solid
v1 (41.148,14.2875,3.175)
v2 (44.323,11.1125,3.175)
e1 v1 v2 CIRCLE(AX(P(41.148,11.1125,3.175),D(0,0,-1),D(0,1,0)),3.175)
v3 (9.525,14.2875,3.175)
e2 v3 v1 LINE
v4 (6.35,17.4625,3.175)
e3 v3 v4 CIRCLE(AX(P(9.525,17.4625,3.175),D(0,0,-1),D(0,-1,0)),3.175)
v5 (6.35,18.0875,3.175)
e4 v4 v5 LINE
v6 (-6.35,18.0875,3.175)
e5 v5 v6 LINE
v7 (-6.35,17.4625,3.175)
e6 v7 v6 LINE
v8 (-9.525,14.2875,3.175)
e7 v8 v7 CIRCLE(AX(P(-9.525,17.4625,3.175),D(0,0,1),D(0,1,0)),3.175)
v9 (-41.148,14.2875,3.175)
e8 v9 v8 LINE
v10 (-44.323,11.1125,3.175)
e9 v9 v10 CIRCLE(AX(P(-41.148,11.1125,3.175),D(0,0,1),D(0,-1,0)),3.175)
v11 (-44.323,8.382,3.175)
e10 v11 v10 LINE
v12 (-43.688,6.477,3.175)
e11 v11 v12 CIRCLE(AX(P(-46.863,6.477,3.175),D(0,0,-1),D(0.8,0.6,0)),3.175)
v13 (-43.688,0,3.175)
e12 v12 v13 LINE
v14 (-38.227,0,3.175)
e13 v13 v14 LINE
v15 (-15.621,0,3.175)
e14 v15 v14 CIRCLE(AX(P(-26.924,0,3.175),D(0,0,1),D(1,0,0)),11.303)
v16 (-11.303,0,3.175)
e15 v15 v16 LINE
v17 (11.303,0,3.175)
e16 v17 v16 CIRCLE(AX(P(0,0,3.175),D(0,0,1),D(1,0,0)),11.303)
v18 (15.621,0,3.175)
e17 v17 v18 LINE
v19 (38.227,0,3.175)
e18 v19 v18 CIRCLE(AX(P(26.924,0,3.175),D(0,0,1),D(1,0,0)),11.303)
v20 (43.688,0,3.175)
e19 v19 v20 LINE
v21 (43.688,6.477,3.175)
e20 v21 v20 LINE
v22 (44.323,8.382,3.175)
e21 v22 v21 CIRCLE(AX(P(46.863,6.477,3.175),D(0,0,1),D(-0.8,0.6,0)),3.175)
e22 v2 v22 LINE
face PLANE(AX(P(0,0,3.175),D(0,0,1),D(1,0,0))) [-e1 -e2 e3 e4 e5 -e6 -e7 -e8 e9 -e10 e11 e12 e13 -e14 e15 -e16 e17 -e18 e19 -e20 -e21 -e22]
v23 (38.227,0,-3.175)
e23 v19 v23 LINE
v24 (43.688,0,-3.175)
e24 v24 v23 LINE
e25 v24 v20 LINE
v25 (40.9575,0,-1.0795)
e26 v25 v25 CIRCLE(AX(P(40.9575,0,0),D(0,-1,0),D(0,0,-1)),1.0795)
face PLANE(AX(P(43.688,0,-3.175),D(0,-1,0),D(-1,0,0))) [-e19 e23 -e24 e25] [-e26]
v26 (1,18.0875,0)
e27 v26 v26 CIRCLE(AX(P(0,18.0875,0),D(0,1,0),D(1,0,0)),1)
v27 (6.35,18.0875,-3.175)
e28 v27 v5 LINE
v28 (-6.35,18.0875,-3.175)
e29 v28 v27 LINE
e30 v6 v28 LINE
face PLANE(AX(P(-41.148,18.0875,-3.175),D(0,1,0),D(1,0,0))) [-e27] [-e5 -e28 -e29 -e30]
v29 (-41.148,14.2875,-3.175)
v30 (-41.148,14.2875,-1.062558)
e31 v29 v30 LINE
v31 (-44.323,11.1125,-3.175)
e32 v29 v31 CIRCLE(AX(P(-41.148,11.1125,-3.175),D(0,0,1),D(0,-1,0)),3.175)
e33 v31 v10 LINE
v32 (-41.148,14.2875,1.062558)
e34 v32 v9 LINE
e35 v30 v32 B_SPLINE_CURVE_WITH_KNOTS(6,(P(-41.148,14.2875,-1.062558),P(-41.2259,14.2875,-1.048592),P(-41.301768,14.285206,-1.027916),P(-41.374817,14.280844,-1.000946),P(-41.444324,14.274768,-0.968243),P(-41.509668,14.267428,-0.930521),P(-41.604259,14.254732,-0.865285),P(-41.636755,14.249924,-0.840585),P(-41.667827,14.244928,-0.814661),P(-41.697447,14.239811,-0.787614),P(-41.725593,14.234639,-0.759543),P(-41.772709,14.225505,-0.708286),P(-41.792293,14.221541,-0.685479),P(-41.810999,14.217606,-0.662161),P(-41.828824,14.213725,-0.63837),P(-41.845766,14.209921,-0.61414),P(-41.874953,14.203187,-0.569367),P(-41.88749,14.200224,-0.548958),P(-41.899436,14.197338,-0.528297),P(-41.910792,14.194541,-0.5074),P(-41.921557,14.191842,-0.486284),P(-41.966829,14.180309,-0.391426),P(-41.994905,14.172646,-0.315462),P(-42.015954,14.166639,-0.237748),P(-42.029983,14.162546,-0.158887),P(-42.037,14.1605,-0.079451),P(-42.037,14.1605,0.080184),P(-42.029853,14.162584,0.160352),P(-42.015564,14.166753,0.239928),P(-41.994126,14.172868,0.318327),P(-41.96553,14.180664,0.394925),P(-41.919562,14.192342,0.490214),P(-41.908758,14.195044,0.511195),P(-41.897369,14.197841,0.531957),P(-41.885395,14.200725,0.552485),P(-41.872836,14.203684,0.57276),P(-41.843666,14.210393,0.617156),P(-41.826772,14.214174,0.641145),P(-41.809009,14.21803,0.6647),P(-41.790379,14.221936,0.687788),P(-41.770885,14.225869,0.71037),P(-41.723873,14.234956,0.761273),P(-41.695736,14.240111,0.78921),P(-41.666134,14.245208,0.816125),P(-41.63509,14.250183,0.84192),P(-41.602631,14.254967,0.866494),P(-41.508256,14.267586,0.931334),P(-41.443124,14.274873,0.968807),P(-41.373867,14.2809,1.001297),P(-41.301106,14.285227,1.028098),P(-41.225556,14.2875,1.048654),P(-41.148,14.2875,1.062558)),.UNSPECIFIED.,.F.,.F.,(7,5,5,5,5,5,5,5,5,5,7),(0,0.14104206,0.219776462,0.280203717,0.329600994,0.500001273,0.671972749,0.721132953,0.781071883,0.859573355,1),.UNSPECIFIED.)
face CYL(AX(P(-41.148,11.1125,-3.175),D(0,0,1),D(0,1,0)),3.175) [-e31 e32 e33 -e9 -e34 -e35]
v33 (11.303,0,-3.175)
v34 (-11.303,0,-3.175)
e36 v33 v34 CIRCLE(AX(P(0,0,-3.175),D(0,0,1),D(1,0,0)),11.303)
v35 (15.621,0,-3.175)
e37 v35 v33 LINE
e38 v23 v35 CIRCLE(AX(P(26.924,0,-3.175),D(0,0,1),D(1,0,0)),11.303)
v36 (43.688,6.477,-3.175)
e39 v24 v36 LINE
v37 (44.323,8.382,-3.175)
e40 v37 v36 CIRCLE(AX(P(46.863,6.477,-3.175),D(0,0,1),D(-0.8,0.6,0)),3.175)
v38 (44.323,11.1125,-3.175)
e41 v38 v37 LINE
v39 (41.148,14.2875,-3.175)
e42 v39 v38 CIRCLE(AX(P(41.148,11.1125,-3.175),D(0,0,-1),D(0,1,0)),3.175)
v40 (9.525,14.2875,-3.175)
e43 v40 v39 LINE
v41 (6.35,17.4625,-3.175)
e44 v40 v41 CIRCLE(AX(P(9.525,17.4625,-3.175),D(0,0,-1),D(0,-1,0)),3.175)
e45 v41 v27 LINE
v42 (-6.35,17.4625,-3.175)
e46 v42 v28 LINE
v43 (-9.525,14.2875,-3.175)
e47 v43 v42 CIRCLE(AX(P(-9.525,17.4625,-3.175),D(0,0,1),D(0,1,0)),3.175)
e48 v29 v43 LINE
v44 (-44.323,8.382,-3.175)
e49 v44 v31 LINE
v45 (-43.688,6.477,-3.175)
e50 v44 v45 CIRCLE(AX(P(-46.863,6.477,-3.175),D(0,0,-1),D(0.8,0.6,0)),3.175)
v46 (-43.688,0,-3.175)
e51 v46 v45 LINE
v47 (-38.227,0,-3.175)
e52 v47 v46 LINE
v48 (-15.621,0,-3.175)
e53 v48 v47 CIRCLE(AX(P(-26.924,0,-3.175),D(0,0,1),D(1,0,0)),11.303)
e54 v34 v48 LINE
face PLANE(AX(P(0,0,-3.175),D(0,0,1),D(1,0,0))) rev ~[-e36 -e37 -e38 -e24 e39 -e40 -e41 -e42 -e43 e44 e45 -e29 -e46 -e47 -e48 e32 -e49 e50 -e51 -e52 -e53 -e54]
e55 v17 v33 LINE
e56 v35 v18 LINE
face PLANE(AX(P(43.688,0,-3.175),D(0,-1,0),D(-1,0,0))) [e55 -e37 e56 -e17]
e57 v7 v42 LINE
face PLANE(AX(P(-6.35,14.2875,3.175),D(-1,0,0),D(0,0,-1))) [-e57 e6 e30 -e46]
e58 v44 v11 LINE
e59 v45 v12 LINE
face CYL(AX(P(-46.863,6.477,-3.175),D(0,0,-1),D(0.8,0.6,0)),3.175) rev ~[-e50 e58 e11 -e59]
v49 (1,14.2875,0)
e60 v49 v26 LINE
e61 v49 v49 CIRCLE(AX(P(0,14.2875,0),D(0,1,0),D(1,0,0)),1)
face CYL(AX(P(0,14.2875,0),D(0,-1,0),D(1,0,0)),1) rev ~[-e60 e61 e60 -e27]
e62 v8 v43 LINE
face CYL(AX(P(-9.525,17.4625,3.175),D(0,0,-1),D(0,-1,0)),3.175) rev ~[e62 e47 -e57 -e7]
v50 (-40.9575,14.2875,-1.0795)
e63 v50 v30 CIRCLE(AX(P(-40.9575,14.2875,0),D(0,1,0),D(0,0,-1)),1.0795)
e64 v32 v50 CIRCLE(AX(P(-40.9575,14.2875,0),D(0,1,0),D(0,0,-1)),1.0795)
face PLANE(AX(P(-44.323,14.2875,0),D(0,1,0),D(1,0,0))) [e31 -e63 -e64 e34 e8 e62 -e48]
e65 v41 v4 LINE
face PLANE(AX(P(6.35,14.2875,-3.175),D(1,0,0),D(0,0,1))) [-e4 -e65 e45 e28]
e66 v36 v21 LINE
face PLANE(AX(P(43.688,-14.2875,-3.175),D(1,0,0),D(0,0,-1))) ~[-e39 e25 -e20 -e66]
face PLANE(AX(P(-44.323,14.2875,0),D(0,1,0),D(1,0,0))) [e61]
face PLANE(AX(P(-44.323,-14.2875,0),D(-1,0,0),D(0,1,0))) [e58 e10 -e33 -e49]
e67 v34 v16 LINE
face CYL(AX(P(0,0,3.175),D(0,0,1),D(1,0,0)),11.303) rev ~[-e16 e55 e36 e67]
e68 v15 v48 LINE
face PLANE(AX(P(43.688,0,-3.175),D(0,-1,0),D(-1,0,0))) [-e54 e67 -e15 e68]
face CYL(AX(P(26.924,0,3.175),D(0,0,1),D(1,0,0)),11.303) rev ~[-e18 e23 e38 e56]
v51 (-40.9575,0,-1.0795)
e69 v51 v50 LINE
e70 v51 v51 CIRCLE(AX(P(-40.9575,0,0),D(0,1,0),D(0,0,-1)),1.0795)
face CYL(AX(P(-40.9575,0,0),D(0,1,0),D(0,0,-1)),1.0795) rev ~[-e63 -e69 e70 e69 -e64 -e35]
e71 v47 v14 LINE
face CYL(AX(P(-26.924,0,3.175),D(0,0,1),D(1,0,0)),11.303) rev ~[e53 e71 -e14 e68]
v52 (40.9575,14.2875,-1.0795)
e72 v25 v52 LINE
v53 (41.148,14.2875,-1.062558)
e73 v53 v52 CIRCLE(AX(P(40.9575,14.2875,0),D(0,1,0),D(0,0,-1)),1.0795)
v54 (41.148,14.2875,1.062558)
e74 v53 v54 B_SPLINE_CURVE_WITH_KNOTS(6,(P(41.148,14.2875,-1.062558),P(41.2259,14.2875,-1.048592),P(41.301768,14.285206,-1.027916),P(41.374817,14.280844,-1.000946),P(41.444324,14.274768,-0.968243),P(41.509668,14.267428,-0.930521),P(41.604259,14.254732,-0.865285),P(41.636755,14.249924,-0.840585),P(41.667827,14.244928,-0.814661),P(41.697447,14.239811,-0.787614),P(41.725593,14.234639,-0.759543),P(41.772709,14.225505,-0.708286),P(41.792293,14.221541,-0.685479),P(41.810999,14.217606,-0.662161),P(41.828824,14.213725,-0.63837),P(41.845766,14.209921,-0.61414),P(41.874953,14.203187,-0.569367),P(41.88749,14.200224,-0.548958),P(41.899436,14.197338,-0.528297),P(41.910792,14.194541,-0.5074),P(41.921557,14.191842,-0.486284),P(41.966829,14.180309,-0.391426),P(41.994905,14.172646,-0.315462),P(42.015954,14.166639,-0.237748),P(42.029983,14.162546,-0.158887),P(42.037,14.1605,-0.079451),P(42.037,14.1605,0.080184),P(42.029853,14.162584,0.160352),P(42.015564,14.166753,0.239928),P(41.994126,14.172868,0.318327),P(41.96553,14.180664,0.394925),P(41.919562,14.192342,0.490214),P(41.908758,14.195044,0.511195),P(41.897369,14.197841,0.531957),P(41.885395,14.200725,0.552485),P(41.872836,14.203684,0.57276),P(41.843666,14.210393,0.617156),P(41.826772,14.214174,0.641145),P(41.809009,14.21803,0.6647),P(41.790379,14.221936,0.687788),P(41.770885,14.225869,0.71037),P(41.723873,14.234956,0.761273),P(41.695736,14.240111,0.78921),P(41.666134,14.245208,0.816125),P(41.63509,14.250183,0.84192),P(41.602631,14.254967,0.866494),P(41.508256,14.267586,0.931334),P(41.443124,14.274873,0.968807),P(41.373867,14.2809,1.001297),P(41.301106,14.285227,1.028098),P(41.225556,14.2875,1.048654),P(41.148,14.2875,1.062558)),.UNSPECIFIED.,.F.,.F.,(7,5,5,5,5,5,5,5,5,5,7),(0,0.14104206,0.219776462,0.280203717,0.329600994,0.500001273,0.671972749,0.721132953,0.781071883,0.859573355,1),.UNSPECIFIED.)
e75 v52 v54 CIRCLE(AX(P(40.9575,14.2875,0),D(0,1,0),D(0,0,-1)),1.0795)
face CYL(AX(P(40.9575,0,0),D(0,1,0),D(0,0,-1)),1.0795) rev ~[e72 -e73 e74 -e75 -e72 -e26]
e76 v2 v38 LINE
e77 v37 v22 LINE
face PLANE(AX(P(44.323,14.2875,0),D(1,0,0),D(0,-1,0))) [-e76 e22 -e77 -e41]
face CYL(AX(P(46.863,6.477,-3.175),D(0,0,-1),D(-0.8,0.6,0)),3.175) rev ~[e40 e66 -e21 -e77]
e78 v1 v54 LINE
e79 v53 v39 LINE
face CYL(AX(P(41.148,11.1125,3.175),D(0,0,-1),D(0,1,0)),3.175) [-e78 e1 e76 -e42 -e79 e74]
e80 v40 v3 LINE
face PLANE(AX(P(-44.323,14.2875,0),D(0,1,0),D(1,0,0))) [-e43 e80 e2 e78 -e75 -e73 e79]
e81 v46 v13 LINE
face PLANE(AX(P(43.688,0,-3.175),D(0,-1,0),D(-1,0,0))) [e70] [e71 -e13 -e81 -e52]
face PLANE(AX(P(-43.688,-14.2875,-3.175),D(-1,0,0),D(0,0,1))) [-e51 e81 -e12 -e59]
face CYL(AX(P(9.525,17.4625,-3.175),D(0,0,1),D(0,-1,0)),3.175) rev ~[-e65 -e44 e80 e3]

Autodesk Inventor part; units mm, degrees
ref_plane "YZ Plane" through (0, 0, 0) normal (1, 0, 0) x (0, 1, 0)
ref_plane "XZ Plane" through (0, 0, 0) normal (0, 1, 0) x (-1, 0, 0)
ref_plane "XY Plane" through (0, 0, 0) normal (0, 0, 1) x (1, 0, 0)
sketch "Sketch1" plane through (0, 0, 0) normal (0, 0, 1) x (1, 0, 0)
  line L0 (-44.323, 14.2875) -> (44.323, 14.2875)
  line L1 (44.323, 14.2875) -> (44.323, -14.2875)
  line L2 (44.323, -14.2875) -> (-44.323, -14.2875)
  line L3 (-44.323, -14.2875) -> (-44.323, 14.2875)
  point P0 (0, 0)
  dimension "d0" = 88.646
  dimension "d1" = 44.323
  dimension "d2" = 14.2875
  dimension "d3" = 28.575
extrude "Extrusion1" add sketch "Sketch1" along normal mid plane 6.35
sketch "Sketch2" plane through (0, 0, 3.175) normal (0, 0, 1) x (1, 0, 0)
  circle A0 centre (-26.924, 0) radius 11.303
  circle A1 centre (0, 0) radius 11.303
  line L0 (44.323, -14.2875) -> (44.323, 14.2875) projected
  circle A2 centre (26.924, 0) radius 11.303
  line L1 (-44.323, 14.2875) -> (-44.323, -14.2875) projected
  line L2 (-44.323, 0) -> (44.323, 0) construction
  line L3 (44.323, 14.2875) -> (-44.323, 14.2875) projected
  point P0 (0, 0)
  dimension "d6" = 22.606
  dimension "d9" = 22.606
  dimension "d11" = 22.606
  dimension "d14" = 26.924
  dimension "d21" = 88.646
  dimension "d22" = 26.924
  dimension "d45" = 0
sketch "Sketch4" plane through (-44.323, -14.2875, -3.175) normal (-1, 0, 0) x (0, 0, 1)
  line L0 (0, 0) -> (0, 28.575) projected
  line L1 (6.35, 28.575) -> (6.35, 0) projected
  line L2 (0, 22.6695) -> (6.35, 22.6695)
  line L3 (6.35, 22.6695) -> (6.35, 5.9055)
  line L4 (6.35, 5.9055) -> (0, 5.9055)
  line L5 (0, 5.9055) -> (0, 22.6695)
  point P0 (3.175, 14.2875)
  dimension "d30" = 8.382
  dimension "d31" = 16.764
extrude "Extrusion3" cut sketch "Sketch4" against normal blind 0.635
mirror "Mirror1" about plane through (0, 0, 0) normal (1, 0, 0) of "Extrusion3"
sketch "Sketch7" plane through (-44.323, -14.2875, 3.175) normal (0, -1, 0) x (1, 0, 0)
  line L0 (30.353, -14.605) -> (58.293, -14.605)
  line L1 (58.293, -14.605) -> (58.293, 8.255)
  line L2 (58.293, 8.255) -> (30.353, 8.255)
  line L3 (30.353, 8.255) -> (30.353, -14.605)
  point P0 (44.323, -3.175)
  dimension "d39" = 27.94
  dimension "d40" = 22.86
  dimension "d41" = 11.43
  dimension "d42" = 13.97
extrude "Extrusion5" [suppressed]
extrude "Extrusion6" cut sketch "Sketch2" against normal blind 25.4
sketch "Sketch8" plane through (0, 0, -3.175) normal (0, 0, -1) x (-1, 0, 0)
  line L0 (43.688, 8.382) -> (43.688, -8.382) construction
  line L1 (43.688, 0) -> (-43.688, 0)
  line L2 (-43.688, 8.382) -> (-43.688, -8.382) construction
  line L3 (44.323, 14.2875) -> (-44.323, 14.2875) projected
  line L4 (44.323, 8.382) -> (44.323, 14.2875) projected
  line L5 (-44.323, 14.2875) -> (-44.323, 8.382) projected
  line L6 (-43.688, 8.382) -> (-43.688, 0)
  line L7 (-44.323, 8.382) -> (-43.688, 8.382) projected
  line L8 (43.688, 8.382) -> (43.688, 0)
  line L9 (43.688, 8.382) -> (44.323, 8.382) projected
  point P0 (0, 0)
extrude "Extrusion7" [suppressed]
sketch "Sketch9" plane through (0, 0, -3.175) normal (0, 0, -1) x (-1, 0, 0)
  line L0 (-44.323, -14.2875) -> (44.323, -14.2875) projected
  line L1 (44.323, -14.2875) -> (44.323, -8.382) projected
  line L2 (44.323, -8.382) -> (43.688, -8.382) projected
  line L3 (-43.688, -8.382) -> (-44.323, -8.382) projected
  line L4 (-44.323, -8.382) -> (-44.323, -14.2875) projected
  line L5 (-43.688, 8.382) -> (-43.688, -8.382) projected
  line L6 (-43.688, 0) -> (-43.688, -8.382)
  line L7 (-43.688, 0) -> (43.688, 0)
  line L8 (43.688, -8.382) -> (43.688, 8.382) projected
  line L9 (43.688, -8.382) -> (43.688, 0)
  point P0 (0, 0)
extrude "Extrusion8" cut sketch "Sketch9" against normal through all
fillet "Fillet1" radius 3.175 2 edges at (-44.323, 14.2875, 0) (44.323, 14.2875, 0)
sketch "Sketch12" plane through (-41.148, 14.2875, -3.175) normal (0, 1, 0) x (1, 0, 0)
  line L0 (82.296, -6.35) -> (0, -6.35) projected
  line L1 (34.798, 0) -> (47.498, 0)
  line L2 (47.498, 0) -> (47.498, -6.35)
  line L3 (47.498, -6.35) -> (34.798, -6.35)
  line L4 (34.798, -6.35) -> (34.798, 0)
  circle A0 centre (41.148, -3.175) radius 1
  line L5 (29.845, 0) -> (52.451, 0) projected
  dimension "d81" = 6.35
  dimension "d82" = 12.7
  dimension "d83" = 2
  dimension "d87" = 0
extrude "Extrusion11" add sketch "Sketch12" along normal blind 3.8
fillet "Fillet3" radius 3.175 2 edges at (6.35, 14.2875, 0) (-6.35, 14.2875, 0)
thread "Thread3" size "M2x0.4" class "6H" standard "ANSI Metric M Profile" full length
fillet "Fillet4" radius 3.175 2 edges at (43.688, 8.382, 0) (-43.688, 8.382, 0)
sketch "Sketch10" plane through (-43.688, 0, -3.175) normal (0, -1, 0) x (1, 0, 0)
  line L0 (5.461, 6.35) -> (5.461, 0) projected
  line L1 (0, 0) -> (0, 6.35) projected
  line L2 (-0.635, 0) -> (-0.635, 6.35) projected
  line L3 (5.461, 6.35) -> (5.461, 0) projected
  line L4 (0, 6.35) -> (5.461, 6.35) projected
  line L5 (0, 0) -> (0, 6.35) projected
  line L6 (5.461, 0) -> (0, 0) projected
  circle A0 centre (2.7305, 3.175) radius 1.5494
  line L7 (86.614, 1.27) -> (80.264, 1.27) projected
  line L8 (86.614, 0) -> (80.264, 0) projected
  point P0 (43.688, 3.175)
  point P1 (84.328, 1.27)
  point P2 (77.978, 1.27)
  point P3 (84.328, 0)
  point P4 (77.978, 0)
  dimension "d58" = 3.0988
  dimension "d61" = 5.461
  dimension "d62" = 2.7305
  dimension "d78" = 3.175
  dimension "d90" = 6.35
hole "Hole1" at (-40.9575, 0, 0) direction (0, 1, 0) diameter 2.159 end through all
mirror "Mirror3" about plane through (0, 0, 0) normal (1, 0, 0) of "Hole1"
equation "\"d1\" = 0.5 * d0"
equation "\"d2\" = 0.5 * d3"
equation "\"d9\" = d7"
equation "\"d11\" = d9"
equation "\"d22\" = d14"
equation "\"d30\" = 0.5 * d31"
equation "\"d41\" = 0.5 * d40"
equation "\"d42\" = 0.5 * d39"
equation "\"d81\" = 0.5 * d82"
equation "\"d62\" = 0.5 * d61"
equation "\"d78\" = 0.5 * d90"
equation "\"d7\" = d6"
properties part number "Tube Holder Halve 2" material "Aluminum 6061-AHC"
